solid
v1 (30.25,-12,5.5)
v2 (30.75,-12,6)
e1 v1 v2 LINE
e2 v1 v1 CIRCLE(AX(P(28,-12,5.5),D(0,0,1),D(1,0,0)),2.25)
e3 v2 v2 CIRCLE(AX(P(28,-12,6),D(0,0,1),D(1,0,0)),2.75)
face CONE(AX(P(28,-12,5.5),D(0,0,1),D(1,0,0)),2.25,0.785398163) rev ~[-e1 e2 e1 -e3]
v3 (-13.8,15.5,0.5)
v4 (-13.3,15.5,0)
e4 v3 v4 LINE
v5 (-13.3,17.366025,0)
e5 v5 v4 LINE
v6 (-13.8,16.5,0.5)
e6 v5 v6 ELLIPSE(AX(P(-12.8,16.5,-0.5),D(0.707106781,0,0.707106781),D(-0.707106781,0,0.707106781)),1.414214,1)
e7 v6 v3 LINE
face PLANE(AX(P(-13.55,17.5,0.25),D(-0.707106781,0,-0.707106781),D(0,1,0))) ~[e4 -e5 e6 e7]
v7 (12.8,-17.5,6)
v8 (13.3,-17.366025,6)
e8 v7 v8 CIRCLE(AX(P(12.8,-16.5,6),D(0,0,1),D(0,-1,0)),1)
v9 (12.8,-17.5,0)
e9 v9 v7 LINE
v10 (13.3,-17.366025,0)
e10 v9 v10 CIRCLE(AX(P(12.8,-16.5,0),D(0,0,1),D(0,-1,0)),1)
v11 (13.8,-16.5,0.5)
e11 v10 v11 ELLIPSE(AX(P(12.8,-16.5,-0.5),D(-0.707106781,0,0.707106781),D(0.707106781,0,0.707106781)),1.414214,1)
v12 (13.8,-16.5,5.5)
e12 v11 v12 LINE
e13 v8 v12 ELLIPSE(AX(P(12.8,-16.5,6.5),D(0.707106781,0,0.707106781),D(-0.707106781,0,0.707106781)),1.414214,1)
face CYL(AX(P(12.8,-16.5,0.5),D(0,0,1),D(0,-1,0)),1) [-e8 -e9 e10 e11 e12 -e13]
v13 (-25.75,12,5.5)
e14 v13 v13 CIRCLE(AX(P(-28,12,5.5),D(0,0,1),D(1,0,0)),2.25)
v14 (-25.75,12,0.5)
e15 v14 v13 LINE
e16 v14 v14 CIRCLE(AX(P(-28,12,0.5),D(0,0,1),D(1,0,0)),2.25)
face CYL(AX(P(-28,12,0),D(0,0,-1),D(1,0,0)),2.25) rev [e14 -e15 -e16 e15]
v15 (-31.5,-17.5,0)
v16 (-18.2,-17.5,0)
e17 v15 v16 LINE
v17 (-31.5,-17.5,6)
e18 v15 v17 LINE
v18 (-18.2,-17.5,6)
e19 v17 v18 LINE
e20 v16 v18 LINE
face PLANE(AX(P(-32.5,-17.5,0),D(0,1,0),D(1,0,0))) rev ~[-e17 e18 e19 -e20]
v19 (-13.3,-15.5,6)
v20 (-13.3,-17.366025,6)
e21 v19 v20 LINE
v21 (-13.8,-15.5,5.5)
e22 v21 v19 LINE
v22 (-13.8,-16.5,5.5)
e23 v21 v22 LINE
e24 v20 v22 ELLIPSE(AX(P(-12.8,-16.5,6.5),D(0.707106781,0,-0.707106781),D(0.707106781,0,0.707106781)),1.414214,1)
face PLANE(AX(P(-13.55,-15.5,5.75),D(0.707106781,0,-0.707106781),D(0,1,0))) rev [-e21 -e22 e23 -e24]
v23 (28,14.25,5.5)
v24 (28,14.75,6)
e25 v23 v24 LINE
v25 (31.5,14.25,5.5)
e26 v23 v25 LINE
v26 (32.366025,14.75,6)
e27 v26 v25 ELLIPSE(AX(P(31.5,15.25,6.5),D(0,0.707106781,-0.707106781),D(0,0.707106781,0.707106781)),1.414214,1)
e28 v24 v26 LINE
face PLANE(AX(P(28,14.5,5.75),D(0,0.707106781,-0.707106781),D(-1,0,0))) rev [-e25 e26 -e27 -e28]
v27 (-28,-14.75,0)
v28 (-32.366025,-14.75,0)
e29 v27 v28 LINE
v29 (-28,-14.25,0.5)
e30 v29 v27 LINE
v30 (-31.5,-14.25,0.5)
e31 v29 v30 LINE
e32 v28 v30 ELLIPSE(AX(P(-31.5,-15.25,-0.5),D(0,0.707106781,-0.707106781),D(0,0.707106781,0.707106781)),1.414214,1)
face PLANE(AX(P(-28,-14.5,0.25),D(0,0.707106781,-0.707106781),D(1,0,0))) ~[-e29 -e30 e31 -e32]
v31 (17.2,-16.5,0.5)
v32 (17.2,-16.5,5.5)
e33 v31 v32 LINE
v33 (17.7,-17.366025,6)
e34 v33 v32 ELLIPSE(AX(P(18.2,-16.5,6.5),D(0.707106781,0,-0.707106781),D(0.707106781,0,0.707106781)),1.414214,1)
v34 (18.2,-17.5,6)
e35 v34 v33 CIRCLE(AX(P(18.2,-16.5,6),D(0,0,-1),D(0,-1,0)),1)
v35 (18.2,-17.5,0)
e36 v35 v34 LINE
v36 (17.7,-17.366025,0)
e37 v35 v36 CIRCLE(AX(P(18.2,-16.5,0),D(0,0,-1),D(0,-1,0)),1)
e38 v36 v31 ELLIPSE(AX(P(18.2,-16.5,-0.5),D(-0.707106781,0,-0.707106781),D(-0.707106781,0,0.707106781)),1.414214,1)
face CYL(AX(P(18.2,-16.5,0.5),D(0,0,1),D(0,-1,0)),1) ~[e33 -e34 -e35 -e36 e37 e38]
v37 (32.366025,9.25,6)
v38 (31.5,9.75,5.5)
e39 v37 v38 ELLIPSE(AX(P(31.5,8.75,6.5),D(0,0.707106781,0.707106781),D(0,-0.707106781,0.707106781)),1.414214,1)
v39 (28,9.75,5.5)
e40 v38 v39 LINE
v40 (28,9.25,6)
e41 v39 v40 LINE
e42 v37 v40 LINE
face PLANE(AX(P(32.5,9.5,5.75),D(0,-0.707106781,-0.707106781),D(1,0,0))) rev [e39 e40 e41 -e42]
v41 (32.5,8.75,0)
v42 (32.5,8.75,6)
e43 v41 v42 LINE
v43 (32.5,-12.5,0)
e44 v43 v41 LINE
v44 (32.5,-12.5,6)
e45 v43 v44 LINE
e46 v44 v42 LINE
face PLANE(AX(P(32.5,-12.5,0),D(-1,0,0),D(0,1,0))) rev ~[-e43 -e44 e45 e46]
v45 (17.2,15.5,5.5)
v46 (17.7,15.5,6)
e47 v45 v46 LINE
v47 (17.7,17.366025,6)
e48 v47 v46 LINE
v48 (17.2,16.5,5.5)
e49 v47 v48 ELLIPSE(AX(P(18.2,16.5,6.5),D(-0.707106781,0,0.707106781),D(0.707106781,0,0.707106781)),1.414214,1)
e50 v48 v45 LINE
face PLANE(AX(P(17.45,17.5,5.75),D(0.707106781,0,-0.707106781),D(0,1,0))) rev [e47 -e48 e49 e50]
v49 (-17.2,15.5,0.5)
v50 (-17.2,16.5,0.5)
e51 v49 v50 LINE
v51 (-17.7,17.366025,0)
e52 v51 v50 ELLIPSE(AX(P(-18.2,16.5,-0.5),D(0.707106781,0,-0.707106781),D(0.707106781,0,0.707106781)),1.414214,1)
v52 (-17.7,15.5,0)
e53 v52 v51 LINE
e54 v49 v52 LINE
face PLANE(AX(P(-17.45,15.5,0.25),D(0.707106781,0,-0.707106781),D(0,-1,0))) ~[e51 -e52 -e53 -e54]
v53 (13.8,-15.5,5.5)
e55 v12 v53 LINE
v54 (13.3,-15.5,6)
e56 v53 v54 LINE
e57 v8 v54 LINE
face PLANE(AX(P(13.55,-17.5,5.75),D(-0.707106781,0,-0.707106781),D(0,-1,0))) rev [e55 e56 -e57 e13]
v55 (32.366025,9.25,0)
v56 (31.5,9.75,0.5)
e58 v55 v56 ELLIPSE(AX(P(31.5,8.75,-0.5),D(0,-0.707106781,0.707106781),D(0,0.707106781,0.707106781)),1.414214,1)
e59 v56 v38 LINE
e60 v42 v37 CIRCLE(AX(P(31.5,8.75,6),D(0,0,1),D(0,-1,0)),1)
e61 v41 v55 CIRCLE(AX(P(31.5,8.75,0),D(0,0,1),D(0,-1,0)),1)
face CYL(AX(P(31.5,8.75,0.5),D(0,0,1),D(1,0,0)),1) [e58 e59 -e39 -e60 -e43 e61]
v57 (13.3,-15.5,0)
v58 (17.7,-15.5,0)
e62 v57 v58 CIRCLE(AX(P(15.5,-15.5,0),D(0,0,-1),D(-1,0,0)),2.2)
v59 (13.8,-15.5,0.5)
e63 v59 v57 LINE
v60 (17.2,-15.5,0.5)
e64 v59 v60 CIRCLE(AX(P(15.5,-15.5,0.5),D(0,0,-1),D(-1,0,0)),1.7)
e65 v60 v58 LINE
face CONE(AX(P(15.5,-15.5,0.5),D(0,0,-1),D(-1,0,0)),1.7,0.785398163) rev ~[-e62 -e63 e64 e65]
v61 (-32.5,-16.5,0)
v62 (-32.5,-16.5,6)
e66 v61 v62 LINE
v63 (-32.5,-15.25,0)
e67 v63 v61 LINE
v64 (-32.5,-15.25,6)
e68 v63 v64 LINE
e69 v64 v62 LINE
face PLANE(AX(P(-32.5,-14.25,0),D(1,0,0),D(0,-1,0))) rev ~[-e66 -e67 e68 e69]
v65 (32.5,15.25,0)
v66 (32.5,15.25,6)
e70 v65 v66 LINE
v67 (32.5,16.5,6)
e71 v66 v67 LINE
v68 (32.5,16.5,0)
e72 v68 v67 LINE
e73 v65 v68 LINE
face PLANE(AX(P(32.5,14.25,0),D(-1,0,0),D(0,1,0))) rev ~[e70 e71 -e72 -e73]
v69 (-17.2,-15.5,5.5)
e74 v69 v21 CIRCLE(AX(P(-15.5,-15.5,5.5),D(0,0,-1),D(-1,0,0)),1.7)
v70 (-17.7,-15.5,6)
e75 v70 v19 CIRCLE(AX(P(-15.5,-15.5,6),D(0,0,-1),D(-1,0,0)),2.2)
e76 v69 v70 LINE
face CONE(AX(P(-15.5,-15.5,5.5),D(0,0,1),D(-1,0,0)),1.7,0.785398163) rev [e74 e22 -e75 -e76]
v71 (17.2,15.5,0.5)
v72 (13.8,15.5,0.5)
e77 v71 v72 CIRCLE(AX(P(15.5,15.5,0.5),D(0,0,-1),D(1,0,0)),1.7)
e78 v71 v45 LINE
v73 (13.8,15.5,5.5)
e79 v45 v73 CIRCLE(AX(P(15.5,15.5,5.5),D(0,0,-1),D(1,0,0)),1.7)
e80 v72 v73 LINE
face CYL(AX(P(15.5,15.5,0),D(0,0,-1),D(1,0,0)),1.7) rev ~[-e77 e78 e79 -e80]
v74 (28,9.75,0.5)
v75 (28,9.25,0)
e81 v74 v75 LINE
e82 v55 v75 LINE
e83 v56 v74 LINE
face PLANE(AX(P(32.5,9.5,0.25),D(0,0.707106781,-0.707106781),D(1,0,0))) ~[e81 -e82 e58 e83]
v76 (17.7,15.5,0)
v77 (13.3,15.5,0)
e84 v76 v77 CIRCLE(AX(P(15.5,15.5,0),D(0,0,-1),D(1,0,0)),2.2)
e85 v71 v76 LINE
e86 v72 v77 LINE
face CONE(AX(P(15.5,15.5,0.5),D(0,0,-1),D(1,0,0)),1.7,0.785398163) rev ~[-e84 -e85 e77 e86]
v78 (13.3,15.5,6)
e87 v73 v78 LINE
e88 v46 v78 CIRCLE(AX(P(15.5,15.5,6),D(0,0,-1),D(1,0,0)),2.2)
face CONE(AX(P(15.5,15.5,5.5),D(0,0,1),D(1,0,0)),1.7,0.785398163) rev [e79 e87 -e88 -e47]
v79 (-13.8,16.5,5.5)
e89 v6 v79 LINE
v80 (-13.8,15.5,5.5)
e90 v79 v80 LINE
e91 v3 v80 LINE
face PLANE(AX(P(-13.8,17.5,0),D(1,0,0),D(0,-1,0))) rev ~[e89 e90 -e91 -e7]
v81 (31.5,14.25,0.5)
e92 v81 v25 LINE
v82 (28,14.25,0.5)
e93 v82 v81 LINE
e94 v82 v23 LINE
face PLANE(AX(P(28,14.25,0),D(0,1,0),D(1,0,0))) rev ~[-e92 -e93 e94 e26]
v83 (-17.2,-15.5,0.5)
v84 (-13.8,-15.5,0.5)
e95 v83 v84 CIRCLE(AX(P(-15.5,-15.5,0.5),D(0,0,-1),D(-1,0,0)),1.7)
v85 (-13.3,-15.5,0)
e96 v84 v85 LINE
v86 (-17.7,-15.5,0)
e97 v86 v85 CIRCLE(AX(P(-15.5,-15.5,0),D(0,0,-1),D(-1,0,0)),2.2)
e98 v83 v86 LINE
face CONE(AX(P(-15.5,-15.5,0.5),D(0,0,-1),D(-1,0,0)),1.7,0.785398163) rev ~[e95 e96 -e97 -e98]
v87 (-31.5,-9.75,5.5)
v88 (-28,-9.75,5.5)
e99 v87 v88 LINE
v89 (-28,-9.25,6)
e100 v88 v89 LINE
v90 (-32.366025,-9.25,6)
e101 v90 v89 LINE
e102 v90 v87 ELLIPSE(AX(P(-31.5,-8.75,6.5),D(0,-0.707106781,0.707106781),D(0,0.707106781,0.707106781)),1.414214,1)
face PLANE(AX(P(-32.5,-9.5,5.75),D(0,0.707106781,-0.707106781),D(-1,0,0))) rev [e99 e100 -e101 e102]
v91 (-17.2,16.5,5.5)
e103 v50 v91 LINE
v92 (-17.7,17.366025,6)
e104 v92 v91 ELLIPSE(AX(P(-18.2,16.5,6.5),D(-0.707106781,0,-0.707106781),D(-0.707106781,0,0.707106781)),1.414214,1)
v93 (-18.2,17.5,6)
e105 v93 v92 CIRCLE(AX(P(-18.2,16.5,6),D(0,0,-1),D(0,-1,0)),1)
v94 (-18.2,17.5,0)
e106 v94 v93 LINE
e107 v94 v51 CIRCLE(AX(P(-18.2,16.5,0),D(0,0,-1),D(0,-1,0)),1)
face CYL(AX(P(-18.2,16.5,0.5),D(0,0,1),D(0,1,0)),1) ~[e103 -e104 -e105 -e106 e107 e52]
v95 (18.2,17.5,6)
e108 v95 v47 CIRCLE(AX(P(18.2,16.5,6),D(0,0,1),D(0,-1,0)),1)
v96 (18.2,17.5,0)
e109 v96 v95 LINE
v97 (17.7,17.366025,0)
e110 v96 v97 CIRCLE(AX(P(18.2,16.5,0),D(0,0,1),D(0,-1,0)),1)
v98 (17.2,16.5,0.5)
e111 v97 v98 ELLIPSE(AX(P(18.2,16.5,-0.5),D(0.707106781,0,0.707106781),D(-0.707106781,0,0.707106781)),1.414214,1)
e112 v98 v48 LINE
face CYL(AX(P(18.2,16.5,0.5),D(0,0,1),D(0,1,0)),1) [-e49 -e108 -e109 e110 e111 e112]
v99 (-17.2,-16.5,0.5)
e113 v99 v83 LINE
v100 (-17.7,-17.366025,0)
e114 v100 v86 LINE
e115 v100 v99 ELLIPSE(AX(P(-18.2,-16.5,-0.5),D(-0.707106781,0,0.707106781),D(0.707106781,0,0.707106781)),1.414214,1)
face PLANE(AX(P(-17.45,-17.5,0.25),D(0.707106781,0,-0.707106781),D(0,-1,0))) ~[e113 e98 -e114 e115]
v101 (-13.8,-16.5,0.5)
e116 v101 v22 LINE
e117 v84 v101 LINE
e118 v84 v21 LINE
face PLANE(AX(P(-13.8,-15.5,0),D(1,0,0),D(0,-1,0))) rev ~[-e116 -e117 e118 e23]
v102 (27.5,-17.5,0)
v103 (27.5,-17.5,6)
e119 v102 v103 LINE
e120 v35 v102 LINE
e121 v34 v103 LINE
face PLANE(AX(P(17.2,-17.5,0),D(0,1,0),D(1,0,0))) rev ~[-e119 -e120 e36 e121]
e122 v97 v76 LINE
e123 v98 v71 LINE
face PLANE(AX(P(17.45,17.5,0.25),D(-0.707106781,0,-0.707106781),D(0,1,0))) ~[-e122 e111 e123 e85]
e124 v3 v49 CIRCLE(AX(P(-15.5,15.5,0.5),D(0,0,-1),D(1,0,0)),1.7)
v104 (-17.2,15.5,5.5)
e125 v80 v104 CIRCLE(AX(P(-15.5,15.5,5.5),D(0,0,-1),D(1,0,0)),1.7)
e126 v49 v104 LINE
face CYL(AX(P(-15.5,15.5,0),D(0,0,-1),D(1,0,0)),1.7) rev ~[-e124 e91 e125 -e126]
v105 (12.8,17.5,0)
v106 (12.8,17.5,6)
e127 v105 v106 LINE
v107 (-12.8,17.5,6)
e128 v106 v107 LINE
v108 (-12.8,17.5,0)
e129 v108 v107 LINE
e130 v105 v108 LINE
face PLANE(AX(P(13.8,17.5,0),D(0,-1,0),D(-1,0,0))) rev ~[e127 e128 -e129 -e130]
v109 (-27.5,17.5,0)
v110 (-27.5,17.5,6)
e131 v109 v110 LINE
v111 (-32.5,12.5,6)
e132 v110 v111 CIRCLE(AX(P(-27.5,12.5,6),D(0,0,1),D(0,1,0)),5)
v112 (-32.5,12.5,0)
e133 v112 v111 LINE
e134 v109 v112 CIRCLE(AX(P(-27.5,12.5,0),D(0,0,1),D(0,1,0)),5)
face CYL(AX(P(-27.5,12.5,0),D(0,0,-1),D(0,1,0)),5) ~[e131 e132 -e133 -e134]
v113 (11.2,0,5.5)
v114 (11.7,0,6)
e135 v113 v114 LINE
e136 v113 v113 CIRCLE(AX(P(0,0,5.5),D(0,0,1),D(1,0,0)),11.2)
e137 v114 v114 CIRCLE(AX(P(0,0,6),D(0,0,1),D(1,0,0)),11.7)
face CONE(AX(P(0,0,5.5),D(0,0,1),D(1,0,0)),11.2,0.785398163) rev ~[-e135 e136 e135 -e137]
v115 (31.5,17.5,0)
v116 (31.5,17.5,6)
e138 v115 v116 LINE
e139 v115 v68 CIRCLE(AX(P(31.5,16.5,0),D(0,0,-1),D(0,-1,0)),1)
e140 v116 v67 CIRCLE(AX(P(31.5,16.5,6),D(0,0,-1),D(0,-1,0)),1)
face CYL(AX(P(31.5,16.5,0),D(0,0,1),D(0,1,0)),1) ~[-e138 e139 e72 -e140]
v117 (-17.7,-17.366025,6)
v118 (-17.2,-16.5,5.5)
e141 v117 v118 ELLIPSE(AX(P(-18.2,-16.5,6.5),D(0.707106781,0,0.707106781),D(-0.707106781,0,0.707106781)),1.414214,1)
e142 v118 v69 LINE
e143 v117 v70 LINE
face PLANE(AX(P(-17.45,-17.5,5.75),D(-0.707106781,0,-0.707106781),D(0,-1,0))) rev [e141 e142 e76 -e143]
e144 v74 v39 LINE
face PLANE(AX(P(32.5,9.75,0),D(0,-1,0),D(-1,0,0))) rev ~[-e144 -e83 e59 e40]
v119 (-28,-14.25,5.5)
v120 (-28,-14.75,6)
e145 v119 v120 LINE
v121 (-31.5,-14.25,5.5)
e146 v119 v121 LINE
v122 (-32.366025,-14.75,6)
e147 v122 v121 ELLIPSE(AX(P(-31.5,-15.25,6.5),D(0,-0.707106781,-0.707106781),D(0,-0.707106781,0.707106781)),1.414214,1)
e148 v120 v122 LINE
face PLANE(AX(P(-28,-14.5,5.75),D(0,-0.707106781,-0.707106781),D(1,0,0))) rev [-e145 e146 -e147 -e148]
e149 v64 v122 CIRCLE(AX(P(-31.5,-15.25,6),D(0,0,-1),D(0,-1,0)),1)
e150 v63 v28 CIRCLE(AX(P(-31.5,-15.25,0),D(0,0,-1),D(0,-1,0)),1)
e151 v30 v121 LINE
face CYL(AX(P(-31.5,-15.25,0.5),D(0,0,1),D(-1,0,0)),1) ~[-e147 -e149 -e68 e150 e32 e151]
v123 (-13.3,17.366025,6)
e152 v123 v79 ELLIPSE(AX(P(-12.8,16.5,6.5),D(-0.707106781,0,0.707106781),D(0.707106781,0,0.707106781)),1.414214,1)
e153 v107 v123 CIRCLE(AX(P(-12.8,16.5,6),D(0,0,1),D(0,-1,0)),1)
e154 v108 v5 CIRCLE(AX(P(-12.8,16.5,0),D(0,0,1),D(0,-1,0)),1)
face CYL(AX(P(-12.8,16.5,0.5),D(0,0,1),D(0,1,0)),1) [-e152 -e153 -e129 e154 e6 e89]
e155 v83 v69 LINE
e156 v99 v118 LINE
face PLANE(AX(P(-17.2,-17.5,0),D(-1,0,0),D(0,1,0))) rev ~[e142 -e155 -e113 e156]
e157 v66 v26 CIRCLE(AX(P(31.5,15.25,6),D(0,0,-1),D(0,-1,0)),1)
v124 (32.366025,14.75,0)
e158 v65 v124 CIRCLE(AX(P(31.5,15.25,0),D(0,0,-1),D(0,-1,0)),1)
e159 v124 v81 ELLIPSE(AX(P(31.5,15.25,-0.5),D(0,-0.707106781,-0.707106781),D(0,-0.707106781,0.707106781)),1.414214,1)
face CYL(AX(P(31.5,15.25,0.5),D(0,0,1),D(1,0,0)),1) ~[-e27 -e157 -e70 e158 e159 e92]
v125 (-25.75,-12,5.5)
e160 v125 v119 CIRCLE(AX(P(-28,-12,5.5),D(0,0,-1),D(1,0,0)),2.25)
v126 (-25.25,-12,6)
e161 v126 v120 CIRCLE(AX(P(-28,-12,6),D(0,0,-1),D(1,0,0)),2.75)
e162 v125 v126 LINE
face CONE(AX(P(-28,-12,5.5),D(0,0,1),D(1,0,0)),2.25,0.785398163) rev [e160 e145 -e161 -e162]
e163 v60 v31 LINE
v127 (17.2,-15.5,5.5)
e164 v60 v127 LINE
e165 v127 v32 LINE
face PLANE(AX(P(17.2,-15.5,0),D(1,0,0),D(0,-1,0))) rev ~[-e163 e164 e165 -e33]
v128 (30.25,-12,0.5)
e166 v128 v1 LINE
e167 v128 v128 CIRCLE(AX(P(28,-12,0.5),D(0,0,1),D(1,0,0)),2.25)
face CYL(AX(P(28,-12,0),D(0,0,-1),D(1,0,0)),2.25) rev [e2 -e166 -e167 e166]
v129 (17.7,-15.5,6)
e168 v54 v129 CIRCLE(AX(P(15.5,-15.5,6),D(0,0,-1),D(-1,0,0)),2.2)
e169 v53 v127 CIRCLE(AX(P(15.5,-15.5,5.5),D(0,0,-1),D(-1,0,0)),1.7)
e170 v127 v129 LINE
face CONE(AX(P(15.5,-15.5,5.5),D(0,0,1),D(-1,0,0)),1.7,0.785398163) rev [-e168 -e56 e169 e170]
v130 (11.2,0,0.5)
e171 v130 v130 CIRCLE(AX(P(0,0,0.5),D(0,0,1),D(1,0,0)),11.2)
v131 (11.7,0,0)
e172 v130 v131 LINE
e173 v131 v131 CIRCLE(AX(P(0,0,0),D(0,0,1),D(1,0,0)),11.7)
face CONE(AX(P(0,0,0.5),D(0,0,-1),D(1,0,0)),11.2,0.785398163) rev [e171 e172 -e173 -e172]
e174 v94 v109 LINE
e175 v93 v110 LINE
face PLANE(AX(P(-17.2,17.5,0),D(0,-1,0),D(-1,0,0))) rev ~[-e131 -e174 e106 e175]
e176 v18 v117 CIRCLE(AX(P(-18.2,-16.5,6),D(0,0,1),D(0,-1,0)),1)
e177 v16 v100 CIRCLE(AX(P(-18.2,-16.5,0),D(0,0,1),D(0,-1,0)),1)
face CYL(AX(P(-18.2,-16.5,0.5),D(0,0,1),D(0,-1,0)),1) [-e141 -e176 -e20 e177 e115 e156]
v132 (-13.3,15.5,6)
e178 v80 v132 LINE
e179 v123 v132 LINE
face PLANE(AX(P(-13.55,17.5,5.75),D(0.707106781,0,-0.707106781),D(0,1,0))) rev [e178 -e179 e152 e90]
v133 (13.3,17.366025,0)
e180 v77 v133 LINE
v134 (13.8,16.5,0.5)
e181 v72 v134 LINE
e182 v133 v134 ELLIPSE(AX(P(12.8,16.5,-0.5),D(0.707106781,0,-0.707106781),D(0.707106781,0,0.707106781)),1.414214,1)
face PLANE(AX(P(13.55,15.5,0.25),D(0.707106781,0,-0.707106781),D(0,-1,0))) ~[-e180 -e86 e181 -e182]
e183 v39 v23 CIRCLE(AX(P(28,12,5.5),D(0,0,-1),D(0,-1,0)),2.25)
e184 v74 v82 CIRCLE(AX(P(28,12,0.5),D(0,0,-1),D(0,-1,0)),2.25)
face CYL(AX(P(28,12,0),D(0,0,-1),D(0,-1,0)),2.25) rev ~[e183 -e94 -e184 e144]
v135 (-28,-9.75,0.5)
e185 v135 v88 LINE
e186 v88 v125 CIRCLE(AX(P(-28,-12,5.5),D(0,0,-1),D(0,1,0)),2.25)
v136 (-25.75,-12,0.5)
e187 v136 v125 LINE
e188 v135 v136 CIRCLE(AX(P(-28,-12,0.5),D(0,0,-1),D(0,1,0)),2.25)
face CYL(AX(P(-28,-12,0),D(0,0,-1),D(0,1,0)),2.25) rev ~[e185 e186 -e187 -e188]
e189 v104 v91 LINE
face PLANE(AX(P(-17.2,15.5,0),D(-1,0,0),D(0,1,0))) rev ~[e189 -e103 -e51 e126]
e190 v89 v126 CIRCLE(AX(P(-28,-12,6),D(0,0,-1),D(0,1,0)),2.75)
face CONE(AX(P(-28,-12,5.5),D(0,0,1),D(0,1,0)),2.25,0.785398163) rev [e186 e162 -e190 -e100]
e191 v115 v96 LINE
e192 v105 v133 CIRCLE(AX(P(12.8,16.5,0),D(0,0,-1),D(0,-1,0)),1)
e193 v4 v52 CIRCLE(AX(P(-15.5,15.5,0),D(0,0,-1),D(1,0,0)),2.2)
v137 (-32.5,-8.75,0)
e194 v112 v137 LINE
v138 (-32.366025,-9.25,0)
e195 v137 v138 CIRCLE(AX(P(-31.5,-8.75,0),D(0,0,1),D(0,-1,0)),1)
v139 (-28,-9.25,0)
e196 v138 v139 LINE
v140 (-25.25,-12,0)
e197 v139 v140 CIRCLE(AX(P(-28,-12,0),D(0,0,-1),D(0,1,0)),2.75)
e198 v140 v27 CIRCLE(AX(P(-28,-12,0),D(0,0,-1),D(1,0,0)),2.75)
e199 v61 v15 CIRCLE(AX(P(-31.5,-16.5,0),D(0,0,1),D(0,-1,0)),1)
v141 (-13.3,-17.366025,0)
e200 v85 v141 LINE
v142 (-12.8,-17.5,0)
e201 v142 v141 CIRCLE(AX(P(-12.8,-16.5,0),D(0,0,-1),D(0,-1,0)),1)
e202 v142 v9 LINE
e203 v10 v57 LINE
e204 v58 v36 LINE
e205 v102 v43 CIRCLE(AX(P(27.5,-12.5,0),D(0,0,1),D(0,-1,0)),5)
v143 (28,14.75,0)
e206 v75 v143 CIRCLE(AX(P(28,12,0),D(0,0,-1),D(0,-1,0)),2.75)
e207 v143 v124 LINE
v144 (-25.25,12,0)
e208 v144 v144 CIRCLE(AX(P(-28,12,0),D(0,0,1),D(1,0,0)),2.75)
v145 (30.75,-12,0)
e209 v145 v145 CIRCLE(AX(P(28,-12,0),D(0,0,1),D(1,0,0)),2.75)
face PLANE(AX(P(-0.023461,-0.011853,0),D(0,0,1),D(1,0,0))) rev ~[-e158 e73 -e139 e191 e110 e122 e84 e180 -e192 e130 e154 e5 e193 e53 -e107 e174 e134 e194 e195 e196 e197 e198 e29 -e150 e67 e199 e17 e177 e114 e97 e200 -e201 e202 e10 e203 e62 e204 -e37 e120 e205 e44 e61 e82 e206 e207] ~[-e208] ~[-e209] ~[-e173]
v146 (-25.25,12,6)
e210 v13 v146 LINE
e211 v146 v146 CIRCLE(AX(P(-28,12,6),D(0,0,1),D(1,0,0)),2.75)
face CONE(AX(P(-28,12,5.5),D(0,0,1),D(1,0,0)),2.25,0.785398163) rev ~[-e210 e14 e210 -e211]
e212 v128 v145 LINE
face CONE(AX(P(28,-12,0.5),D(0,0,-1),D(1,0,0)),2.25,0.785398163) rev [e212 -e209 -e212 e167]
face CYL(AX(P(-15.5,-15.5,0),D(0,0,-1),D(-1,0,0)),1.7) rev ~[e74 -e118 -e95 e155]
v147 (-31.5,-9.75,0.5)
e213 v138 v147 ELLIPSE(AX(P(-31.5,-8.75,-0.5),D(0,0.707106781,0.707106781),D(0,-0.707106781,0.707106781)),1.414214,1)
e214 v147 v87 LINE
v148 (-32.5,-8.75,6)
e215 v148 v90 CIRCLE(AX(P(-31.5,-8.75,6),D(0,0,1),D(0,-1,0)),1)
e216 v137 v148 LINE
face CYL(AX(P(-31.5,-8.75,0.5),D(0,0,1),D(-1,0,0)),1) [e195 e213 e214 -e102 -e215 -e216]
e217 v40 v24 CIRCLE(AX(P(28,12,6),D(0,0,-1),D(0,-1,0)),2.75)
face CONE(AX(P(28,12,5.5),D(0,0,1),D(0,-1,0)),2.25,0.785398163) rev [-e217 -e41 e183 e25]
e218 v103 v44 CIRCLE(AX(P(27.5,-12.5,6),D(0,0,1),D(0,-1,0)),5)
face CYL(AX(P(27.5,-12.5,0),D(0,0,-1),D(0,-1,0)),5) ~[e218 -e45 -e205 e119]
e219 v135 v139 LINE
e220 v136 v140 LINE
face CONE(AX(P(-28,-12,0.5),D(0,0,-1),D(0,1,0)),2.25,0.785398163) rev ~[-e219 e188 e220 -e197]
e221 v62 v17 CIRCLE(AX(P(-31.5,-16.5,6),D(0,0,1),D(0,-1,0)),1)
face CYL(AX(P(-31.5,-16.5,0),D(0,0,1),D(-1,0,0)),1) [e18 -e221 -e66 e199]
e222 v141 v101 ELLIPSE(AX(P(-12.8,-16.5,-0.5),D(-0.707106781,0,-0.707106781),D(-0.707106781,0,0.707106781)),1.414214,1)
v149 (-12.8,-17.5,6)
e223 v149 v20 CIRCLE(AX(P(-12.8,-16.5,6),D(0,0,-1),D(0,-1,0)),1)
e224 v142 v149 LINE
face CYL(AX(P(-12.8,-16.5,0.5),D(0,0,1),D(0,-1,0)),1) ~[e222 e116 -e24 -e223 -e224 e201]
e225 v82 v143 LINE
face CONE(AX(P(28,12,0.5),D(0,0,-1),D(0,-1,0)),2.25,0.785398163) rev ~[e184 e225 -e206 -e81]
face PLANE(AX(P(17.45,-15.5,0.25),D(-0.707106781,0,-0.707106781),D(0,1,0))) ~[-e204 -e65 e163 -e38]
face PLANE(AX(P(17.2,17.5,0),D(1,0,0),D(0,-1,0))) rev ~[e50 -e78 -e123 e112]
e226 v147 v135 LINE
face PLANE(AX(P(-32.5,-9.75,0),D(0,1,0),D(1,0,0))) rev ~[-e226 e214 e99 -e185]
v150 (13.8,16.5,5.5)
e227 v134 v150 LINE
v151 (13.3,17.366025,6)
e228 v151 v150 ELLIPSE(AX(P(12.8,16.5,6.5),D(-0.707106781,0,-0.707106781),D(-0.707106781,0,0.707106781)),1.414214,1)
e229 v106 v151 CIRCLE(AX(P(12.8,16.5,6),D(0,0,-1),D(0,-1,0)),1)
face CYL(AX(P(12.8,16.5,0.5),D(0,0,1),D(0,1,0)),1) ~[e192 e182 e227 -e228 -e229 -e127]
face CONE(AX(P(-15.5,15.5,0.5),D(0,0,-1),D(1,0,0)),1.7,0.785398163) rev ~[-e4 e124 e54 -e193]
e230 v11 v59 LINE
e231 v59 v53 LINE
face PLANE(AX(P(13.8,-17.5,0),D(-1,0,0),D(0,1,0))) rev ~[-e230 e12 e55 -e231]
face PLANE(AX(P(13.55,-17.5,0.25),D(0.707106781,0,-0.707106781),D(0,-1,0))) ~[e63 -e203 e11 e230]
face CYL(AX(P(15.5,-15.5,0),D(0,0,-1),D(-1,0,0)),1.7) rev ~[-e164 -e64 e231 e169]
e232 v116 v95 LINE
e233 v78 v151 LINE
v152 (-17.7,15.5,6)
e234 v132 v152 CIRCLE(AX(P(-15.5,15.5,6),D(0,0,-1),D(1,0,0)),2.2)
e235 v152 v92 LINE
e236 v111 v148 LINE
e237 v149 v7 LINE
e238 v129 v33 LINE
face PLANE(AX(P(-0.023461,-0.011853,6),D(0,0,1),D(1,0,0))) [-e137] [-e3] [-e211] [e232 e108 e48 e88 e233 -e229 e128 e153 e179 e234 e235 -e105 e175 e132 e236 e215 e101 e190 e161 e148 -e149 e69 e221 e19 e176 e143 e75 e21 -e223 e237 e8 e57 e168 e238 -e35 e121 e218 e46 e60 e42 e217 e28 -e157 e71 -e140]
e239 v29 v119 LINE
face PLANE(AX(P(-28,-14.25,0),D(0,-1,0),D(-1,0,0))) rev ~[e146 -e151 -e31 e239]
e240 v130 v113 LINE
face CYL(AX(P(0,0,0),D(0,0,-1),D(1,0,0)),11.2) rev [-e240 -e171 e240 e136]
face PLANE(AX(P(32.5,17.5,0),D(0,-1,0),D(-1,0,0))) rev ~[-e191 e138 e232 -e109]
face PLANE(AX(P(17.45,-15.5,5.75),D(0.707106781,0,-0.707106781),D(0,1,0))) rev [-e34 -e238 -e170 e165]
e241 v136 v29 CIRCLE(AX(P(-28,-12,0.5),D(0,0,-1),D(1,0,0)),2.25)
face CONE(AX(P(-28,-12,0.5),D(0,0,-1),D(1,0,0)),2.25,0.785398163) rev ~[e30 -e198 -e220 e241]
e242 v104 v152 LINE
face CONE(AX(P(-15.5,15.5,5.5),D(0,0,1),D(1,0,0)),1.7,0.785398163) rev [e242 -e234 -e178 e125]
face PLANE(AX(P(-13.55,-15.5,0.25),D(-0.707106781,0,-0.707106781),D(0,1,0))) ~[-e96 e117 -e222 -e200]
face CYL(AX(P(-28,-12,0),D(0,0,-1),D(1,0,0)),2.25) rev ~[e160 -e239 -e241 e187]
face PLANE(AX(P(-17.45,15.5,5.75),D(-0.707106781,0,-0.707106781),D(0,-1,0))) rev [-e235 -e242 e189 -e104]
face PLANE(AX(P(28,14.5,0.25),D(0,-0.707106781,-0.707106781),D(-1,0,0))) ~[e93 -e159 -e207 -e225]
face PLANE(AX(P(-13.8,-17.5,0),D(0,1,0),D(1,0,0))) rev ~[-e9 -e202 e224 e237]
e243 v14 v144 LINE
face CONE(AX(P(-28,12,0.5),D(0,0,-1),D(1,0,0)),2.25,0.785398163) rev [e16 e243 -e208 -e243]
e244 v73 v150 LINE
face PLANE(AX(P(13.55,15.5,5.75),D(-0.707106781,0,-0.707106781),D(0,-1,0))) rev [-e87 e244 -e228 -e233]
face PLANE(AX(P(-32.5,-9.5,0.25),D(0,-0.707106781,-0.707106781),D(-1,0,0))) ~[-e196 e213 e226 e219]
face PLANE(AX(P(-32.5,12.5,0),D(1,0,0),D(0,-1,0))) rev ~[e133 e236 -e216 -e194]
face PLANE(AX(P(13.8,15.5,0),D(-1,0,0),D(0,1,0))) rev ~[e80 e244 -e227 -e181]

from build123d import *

# Parameters (mm, degrees)
F0_R     = 2.25
F0_R_2   = 11.2
F1_DEPTH = 6
F2_SIZE  = 0.5
F3_R     = 1


with BuildPart() as f1:
    # F0 (on Top) → F1 (new body)
    with BuildSketch(Plane.XY):
        with BuildLine():
            Line((-17.2, 17.5), (-27.5, 17.5))
            ThreePointArc((-27.5, 17.5), (-31.0355339059, 16.0355339059), (-32.5, 12.5))
            Line((-32.5, 12.5), (-32.5, -9.75))
            Line((-32.5, -9.75), (-28, -9.75))
            ThreePointArc((-28, -9.75), (-26.4090097423, -10.4090097423), (-25.75, -12))
            ThreePointArc((-25.75, -12), (-26.4090097423, -13.5909902577), (-28, -14.25))
            Line((-28, -14.25), (-32.5, -14.25))
            Line((-32.5, -14.25), (-32.5, -17.5))
            Line((-32.5, -17.5), (-17.2, -17.5))
            Line((-17.2, -17.5), (-17.2, -15.5))
            ThreePointArc((-17.2, -15.5), (-15.5, -13.8), (-13.8, -15.5))
            Line((-13.8, -15.5), (-13.8, -17.5))
            Line((-13.8, -17.5), (13.8, -17.5))
            Line((13.8, -17.5), (13.8, -15.5))
            ThreePointArc((13.8, -15.5), (15.5, -13.8), (17.2, -15.5))
            Line((17.2, -15.5), (17.2, -17.5))
            Line((17.2, -17.5), (27.5, -17.5))
            ThreePointArc((27.5, -17.5), (31.0355339059, -16.0355339059), (32.5, -12.5))
            Line((32.5, -12.5), (32.5, 9.75))
            Line((32.5, 9.75), (28, 9.75))
            ThreePointArc((28, 9.75), (25.75, 12), (28, 14.25))
            Line((28, 14.25), (32.5, 14.25))
            Line((32.5, 14.25), (32.5, 17.5))
            Line((32.5, 17.5), (17.2, 17.5))
            Line((17.2, 17.5), (17.2, 15.5))
            ThreePointArc((17.2, 15.5), (15.5, 13.8), (13.8, 15.5))
            Line((13.8, 15.5), (13.8, 17.5))
            Line((13.8, 17.5), (-13.8, 17.5))
            Line((-13.8, 17.5), (-13.8, 15.5))
            ThreePointArc((-13.8, 15.5), (-15.5, 13.8), (-17.2, 15.5))
            Line((-17.2, 15.5), (-17.2, 17.5))
        make_face()
        with Locations((28, -12)):
            Circle(F0_R, mode=Mode.SUBTRACT)
        with Locations((-28, 12)):
            Circle(F0_R, mode=Mode.SUBTRACT)
        Circle(F0_R_2, mode=Mode.SUBTRACT)
    extrude(amount=F1_DEPTH)

    # F2
    f2_edges = [f1.edges().sort_by_distance(p)[0] for p in [
        (-11.2, 0, 6),
        (-11.2, 0, 0),
        (-25.75, -12, 0),
        (-15.5, -13.8, 0),
        (15.5, -13.8, 0),
        (25.75, -12, 0),
        (25.75, 12, 0),
        (15.5, 13.8, 0),
        (-15.5, 13.8, 0),
        (-30.25, 12, 0),
        (-30.25, 12, 6),
        (-15.5, 13.8, 6),
        (15.5, 13.8, 6),
        (25.75, 12, 6),
        (-25.75, -12, 6),
        (-15.5, -13.8, 6),
        (15.5, -13.8, 6),
        (25.75, -12, 6),
        (-13.8, 16.5, 6),
        (-17.2, 16.5, 6),
        (-30.25, -9.75, 6),
        (-30.25, -14.25, 6),
        (-17.2, -16.5, 6),
        (-13.8, -16.5, 6),
        (13.8, -16.5, 6),
        (17.2, -16.5, 6),
        (30.25, 9.75, 6),
        (30.25, 14.25, 6),
        (17.2, 16.5, 6),
        (13.8, 16.5, 6),
        (17.2, 16.5, 0),
        (30.25, 14.25, 0),
        (30.25, 9.75, 0),
        (17.2, -16.5, 0),
        (13.8, -16.5, 0),
        (-13.8, -16.5, 0),
        (-17.2, -16.5, 0),
        (-30.25, -14.25, 0),
        (-30.25, -9.75, 0),
        (-17.2, 16.5, 0),
        (-13.8, 16.5, 0),
        (13.8, 16.5, 0),
    ]]
    chamfer(f2_edges, length=F2_SIZE)

    # F3
    f3_edges = [f1.edges().sort_by_distance(p)[0] for p in [
        (-32.5, -14.25, 3),
        (-32.5, -9.75, 3),
        (-32.5, -17.5, 3),
        (-17.2, -17.5, 3),
        (-13.8, -17.5, 3),
        (13.8, -17.5, 3),
        (17.2, -17.5, 3),
        (32.5, 14.25, 3),
        (32.5, 9.75, 3),
        (32.5, 17.5, 3),
        (17.2, 17.5, 3),
        (13.8, 17.5, 3),
        (-13.8, 17.5, 3),
        (-17.2, 17.5, 3),
    ]]
    fillet(f3_edges, radius=F3_R)


solid = f1.part
